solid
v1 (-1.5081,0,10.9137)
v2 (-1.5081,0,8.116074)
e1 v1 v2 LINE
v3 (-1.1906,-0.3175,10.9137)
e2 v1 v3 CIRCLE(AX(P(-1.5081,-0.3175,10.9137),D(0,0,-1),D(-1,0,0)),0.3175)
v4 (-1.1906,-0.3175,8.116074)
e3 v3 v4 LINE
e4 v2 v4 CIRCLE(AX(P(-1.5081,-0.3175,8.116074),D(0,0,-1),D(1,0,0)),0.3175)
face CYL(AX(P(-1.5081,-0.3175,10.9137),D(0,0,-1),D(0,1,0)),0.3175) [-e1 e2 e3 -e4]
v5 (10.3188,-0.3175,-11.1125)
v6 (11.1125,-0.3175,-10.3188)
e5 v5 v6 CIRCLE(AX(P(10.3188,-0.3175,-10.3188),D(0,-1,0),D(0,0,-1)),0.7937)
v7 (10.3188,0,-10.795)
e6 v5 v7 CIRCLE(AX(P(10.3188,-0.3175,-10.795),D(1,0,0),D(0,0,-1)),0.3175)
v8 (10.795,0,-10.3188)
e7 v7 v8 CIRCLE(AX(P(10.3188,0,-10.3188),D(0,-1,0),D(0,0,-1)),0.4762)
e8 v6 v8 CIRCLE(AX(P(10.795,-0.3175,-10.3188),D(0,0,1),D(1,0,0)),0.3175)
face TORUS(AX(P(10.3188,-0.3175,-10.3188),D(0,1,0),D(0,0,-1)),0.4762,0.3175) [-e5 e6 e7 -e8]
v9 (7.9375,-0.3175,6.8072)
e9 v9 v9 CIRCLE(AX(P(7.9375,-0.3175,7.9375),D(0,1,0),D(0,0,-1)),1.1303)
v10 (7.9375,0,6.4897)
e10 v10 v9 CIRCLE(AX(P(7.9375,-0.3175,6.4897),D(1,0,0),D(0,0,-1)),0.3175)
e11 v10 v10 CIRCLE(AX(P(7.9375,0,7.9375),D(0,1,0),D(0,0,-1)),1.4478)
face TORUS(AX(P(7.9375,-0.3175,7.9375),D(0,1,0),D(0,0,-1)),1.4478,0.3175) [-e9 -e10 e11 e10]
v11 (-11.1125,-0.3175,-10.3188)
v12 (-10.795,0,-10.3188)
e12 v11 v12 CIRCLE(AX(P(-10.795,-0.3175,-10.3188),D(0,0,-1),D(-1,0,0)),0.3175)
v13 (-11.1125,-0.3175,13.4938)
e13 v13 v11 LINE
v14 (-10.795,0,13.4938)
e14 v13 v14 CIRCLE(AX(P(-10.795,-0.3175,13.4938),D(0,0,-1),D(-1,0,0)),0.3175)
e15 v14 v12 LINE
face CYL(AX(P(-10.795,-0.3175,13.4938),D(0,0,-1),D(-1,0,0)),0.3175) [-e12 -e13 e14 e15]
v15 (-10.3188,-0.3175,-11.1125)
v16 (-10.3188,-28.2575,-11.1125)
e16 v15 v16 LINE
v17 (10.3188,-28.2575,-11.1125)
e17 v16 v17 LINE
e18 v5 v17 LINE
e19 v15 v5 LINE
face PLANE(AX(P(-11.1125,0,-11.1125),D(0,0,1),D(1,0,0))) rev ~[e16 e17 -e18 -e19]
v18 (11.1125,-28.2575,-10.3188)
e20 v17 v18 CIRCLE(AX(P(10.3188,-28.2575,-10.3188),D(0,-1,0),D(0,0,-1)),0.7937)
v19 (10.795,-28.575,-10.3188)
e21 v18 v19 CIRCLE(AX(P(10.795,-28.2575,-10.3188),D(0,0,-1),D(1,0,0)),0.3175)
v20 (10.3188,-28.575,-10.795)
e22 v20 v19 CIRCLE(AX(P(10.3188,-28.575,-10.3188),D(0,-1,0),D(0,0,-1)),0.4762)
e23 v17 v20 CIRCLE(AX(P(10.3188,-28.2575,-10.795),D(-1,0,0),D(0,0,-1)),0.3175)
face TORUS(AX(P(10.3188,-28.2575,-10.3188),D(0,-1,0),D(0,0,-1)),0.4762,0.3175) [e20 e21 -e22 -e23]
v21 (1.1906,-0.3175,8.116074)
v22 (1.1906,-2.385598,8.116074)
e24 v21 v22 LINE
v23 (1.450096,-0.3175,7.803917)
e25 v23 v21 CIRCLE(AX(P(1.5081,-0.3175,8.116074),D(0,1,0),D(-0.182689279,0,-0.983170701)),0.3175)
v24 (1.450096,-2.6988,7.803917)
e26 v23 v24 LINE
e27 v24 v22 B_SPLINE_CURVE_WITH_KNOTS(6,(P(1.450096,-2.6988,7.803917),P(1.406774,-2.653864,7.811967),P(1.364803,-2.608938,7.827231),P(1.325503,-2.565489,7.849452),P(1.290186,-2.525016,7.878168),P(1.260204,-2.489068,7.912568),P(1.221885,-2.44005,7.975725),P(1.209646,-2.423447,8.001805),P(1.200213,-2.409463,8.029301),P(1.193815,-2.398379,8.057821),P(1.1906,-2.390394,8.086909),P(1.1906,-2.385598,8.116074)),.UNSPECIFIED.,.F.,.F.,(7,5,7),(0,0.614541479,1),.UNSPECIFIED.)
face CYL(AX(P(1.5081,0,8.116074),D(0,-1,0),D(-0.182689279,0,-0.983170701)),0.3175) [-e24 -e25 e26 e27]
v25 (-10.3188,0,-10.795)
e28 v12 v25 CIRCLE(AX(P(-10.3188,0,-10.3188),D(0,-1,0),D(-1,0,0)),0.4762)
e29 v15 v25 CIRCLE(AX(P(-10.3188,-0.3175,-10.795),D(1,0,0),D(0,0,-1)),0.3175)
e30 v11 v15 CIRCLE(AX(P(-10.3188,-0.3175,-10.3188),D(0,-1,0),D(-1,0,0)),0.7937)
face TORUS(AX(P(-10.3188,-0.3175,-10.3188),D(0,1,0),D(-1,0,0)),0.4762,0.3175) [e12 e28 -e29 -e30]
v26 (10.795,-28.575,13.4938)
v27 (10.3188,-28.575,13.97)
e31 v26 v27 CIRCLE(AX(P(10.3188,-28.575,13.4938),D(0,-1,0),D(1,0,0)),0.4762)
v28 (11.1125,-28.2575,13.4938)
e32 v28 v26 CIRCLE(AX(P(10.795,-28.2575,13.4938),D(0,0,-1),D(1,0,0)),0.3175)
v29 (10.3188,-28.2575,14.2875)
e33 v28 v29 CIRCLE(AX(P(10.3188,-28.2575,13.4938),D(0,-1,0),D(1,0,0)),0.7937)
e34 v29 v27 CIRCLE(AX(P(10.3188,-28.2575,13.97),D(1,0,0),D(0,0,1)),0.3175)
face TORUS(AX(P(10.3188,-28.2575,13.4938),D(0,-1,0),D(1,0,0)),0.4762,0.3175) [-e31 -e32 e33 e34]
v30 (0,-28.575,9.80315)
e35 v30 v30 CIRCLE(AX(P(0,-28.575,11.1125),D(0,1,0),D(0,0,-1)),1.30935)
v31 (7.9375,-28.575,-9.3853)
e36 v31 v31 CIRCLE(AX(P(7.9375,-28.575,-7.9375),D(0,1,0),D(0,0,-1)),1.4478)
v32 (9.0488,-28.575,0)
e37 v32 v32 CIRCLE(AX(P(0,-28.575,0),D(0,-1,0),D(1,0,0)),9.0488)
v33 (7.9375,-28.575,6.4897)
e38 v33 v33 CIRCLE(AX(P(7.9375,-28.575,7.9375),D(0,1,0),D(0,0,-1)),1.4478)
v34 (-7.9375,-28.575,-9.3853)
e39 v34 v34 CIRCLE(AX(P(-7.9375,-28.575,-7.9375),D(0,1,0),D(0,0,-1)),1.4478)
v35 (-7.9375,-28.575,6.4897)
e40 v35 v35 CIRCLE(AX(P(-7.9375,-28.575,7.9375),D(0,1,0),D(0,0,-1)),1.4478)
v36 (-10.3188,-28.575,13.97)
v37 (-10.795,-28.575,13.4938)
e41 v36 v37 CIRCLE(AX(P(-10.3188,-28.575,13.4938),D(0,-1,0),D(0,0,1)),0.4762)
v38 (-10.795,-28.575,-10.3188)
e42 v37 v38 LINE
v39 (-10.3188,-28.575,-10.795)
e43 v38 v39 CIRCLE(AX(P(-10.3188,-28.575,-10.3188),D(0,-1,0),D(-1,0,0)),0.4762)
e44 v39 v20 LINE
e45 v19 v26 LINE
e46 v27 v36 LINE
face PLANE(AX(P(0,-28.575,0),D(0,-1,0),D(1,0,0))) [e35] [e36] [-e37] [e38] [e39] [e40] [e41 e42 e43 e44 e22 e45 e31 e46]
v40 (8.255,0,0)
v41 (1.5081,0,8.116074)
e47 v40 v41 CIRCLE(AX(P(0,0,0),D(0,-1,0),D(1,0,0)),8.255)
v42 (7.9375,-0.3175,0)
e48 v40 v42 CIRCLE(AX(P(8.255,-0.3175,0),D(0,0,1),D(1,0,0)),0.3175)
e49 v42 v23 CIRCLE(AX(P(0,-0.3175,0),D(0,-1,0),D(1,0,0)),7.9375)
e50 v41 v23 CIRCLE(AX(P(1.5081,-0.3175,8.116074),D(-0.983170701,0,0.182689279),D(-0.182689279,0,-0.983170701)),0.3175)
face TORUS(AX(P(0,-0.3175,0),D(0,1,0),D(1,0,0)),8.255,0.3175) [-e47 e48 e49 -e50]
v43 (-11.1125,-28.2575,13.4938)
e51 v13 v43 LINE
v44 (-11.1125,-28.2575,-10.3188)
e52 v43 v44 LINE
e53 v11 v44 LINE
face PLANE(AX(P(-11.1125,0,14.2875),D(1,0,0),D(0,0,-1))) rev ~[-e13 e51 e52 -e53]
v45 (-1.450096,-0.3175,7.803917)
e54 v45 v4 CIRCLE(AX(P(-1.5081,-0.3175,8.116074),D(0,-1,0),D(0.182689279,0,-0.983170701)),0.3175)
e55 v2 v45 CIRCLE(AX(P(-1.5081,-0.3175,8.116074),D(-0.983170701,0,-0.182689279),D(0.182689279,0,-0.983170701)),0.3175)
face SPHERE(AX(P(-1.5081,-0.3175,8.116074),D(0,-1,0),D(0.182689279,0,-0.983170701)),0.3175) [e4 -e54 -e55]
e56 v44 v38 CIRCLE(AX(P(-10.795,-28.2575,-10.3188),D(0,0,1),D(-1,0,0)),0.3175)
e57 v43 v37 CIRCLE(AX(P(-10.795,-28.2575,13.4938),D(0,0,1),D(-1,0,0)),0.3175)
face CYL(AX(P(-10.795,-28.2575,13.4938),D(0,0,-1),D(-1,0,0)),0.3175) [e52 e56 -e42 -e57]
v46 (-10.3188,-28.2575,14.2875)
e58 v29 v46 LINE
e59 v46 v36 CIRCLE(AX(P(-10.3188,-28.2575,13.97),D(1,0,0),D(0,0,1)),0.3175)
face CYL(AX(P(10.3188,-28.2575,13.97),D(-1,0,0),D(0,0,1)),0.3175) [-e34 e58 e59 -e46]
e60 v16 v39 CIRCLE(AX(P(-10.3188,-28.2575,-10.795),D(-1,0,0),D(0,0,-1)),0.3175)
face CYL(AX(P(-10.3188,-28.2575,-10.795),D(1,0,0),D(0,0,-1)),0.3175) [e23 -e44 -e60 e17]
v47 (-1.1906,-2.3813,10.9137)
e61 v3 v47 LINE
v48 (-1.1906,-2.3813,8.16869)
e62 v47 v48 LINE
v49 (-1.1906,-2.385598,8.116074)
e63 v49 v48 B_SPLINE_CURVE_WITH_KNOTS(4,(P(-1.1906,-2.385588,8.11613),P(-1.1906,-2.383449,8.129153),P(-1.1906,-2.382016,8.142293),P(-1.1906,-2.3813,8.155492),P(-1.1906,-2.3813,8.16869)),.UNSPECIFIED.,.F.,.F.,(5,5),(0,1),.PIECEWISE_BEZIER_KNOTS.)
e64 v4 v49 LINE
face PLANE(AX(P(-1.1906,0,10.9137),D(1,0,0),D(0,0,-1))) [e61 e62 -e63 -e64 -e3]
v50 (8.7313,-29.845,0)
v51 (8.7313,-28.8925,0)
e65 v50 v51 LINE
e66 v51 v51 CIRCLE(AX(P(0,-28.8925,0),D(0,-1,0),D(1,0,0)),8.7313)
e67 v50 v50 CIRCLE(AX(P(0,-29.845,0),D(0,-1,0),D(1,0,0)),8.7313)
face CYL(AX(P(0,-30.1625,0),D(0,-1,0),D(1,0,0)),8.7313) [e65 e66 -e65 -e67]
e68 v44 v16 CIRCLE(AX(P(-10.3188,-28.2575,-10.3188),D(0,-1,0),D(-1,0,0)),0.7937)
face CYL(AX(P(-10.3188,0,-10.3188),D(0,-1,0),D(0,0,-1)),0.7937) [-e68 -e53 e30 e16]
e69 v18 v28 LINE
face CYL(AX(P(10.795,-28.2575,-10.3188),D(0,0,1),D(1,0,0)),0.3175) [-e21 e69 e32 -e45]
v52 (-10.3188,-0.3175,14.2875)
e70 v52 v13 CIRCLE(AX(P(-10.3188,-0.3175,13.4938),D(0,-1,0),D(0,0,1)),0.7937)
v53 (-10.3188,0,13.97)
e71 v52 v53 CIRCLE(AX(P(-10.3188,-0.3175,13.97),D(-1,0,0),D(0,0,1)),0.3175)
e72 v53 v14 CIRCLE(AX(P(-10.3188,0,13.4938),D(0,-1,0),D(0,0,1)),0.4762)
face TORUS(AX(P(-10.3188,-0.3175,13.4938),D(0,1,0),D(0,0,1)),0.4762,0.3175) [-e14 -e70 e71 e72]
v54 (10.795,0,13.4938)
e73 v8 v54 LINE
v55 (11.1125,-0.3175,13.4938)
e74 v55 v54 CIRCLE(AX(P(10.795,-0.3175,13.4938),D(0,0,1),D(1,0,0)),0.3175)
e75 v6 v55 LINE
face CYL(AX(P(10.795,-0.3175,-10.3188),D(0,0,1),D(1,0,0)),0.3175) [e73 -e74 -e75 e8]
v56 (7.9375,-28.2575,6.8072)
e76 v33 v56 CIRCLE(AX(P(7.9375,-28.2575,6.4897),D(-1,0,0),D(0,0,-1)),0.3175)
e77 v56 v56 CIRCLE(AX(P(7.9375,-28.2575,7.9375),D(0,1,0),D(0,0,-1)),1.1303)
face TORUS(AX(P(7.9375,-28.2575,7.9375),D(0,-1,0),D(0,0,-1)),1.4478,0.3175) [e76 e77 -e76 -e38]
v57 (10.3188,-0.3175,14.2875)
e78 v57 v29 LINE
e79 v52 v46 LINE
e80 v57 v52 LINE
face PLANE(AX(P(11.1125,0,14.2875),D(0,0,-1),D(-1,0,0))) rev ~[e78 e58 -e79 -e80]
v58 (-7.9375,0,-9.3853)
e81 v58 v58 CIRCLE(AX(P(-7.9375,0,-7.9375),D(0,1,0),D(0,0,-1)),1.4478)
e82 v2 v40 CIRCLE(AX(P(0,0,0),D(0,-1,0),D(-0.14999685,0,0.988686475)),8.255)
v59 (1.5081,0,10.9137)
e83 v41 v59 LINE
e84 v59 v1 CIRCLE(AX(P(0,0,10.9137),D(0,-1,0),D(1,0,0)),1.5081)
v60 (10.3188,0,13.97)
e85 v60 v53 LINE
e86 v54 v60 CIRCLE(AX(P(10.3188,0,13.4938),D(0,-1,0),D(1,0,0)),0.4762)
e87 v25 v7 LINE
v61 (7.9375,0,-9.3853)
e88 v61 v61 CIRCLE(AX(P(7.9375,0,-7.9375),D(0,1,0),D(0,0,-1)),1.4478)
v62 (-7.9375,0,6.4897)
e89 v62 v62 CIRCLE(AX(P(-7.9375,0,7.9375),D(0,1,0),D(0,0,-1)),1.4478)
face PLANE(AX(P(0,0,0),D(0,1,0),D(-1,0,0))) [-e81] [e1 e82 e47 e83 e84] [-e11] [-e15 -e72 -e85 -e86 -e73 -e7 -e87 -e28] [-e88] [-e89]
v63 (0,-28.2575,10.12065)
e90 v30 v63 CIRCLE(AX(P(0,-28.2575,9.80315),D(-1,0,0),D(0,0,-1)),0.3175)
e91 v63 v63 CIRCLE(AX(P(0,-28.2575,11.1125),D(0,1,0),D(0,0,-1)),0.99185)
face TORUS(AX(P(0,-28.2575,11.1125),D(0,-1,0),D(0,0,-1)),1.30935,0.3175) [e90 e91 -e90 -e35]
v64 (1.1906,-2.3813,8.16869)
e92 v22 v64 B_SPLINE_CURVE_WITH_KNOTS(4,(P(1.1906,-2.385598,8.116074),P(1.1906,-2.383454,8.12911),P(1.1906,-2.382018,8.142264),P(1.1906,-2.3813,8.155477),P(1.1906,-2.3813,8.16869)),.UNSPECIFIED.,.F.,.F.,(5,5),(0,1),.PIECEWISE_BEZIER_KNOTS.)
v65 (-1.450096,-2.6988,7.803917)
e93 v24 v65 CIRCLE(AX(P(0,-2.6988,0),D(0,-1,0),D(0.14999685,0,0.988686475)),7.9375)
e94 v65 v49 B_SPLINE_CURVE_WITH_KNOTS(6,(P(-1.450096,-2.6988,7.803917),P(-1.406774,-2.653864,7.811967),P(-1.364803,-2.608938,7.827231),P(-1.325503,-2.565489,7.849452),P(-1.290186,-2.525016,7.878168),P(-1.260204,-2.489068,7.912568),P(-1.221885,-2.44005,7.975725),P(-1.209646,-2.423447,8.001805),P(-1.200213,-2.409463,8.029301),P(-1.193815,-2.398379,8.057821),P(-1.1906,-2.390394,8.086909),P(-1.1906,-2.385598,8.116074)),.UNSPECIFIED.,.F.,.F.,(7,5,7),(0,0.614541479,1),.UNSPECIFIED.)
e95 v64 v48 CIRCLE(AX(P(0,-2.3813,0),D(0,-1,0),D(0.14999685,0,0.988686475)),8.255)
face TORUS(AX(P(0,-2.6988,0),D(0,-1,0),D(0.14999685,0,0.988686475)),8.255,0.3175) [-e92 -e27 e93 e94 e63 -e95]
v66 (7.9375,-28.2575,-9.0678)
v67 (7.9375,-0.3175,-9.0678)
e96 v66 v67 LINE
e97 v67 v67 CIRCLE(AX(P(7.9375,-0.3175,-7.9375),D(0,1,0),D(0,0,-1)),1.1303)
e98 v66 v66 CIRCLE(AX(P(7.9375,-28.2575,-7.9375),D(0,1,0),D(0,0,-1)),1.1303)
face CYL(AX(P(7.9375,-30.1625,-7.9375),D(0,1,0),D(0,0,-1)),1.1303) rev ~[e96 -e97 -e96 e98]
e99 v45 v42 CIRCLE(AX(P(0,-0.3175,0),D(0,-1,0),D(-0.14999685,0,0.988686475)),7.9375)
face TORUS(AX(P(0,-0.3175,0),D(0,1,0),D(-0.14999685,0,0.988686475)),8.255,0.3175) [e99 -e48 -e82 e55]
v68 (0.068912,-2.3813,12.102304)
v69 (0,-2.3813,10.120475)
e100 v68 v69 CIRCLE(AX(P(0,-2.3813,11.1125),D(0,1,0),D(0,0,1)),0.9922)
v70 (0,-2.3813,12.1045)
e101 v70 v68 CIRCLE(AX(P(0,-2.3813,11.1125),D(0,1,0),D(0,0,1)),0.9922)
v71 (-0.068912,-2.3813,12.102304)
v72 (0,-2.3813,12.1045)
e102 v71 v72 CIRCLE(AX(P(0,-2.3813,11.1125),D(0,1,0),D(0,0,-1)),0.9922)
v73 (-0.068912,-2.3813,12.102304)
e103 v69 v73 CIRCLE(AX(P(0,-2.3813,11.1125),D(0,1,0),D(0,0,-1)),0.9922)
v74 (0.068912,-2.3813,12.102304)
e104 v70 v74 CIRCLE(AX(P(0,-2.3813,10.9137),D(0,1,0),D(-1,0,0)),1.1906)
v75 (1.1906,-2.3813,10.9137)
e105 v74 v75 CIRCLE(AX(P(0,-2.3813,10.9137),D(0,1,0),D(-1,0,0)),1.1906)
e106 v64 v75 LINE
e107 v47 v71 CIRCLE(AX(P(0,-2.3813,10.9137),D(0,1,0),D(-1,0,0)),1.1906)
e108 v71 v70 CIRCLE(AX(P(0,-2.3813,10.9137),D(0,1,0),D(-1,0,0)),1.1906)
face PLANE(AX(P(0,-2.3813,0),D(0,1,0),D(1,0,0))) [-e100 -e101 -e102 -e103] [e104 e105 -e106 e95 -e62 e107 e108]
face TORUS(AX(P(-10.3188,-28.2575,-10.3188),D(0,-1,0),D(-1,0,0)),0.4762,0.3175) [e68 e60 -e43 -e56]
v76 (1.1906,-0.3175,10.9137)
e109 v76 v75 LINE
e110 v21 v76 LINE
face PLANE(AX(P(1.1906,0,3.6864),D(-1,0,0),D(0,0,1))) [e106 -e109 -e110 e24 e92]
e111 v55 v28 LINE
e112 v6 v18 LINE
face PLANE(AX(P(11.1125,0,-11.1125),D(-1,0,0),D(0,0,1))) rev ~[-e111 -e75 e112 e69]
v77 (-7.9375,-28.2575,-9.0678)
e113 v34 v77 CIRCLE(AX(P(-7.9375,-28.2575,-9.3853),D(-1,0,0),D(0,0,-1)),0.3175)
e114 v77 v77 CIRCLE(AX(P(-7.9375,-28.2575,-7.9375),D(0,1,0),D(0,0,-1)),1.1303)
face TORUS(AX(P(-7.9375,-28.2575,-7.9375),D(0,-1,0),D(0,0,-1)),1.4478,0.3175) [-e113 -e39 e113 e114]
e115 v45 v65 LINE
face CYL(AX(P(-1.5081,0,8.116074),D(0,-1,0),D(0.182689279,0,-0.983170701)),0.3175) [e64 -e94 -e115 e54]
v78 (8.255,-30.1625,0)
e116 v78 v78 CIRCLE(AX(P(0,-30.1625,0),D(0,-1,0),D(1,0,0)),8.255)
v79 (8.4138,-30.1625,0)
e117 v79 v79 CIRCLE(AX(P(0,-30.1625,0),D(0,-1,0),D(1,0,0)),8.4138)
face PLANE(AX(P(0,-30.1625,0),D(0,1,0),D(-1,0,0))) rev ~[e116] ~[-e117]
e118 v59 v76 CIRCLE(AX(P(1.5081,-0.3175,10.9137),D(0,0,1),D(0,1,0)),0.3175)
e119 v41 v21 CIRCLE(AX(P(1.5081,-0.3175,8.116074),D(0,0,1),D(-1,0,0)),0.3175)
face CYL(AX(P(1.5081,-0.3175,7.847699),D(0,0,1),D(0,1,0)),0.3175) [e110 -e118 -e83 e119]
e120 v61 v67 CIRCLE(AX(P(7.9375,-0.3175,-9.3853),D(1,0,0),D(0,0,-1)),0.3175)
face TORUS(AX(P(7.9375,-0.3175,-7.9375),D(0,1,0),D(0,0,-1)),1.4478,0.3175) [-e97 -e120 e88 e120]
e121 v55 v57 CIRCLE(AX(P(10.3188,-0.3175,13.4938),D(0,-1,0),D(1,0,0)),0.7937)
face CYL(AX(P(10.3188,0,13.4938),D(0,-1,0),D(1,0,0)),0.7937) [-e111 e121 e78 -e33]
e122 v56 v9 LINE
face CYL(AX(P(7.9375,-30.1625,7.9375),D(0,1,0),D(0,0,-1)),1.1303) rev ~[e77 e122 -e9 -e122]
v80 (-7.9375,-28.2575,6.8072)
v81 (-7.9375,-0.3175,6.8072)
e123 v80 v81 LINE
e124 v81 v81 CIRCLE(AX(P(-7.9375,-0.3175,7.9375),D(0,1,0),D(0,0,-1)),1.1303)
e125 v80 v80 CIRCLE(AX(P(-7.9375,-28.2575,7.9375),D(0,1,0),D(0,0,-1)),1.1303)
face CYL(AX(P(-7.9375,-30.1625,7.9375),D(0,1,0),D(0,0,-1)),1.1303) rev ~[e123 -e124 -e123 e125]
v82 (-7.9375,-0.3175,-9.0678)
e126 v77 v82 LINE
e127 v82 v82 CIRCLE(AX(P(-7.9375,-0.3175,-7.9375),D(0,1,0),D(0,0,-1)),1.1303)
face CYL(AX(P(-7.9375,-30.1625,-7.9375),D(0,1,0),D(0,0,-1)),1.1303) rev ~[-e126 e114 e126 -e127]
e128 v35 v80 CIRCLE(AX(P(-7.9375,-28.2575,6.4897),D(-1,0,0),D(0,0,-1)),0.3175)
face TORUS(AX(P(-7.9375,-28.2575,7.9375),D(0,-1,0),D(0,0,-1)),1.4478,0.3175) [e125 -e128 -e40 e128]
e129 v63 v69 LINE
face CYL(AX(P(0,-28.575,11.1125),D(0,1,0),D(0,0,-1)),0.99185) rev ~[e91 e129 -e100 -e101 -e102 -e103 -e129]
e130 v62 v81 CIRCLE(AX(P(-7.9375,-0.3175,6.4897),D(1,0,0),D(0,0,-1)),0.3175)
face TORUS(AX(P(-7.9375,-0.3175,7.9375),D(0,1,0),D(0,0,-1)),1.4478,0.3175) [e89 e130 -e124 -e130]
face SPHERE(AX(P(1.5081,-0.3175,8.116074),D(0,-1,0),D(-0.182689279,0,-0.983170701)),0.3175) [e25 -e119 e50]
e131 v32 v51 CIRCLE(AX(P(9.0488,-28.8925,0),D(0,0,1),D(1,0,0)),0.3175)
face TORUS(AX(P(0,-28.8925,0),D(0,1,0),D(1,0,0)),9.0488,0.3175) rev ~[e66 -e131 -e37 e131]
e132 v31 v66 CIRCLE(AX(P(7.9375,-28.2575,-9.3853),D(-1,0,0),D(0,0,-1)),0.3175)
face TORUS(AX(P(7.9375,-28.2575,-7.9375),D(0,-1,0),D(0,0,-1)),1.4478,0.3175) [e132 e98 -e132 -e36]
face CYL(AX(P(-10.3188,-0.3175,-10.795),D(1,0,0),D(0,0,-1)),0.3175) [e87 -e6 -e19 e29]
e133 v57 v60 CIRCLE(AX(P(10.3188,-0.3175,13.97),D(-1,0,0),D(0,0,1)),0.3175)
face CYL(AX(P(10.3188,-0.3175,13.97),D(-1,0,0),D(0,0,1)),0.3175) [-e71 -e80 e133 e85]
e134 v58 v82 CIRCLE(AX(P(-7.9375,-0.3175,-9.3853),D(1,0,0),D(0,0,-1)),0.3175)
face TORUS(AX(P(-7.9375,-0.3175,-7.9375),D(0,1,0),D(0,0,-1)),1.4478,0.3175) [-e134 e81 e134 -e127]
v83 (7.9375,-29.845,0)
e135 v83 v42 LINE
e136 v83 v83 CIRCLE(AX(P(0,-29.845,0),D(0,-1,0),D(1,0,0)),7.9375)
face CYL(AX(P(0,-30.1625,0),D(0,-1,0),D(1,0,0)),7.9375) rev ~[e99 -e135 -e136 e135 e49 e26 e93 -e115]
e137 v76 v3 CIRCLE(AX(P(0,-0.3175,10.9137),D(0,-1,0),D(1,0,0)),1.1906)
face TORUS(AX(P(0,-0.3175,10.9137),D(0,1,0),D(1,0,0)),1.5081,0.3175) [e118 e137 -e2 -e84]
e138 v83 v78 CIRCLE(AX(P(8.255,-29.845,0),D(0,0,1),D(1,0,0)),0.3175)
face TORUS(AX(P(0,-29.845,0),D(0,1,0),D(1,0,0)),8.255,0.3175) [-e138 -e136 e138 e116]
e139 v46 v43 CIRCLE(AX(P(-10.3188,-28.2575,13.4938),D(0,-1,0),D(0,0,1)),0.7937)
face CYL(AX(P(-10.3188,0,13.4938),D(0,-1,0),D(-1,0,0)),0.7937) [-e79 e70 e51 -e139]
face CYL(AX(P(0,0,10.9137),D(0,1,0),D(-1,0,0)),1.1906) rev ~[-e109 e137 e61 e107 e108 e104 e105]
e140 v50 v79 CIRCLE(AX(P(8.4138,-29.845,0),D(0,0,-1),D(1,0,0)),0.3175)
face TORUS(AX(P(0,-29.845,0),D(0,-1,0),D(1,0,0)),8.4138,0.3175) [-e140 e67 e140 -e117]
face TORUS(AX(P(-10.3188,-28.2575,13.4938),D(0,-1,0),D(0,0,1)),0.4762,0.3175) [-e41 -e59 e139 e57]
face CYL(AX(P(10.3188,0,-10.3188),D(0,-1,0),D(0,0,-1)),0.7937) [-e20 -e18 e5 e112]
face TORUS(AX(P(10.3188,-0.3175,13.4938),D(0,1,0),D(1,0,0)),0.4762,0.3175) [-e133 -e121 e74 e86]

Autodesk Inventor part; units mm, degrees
ref_plane "YZ Plane" through (0, 0, 0) normal (1, 0, 0) x (0, 1, 0)
ref_plane "XZ Plane" through (0, 0, 0) normal (0, 1, 0) x (-1, 0, 0)
ref_plane "XY Plane" through (0, 0, 0) normal (0, 0, 1) x (1, 0, 0)
sketch "Sketch1" plane through (0, 0, 0) normal (0, 1, 0) x (-1, 0, 0)
  line L0 (11.1125, -11.1125) -> (-11.1125, -11.1125)
  line L1 (-11.1125, -11.1125) -> (-11.1125, 14.2875)
  line L2 (-11.1125, 14.2875) -> (11.1125, 14.2875)
  line L3 (11.1125, 14.2875) -> (11.1125, -11.1125)
  point P0 (0, 0)
  dimension "d0" = 25.4
  dimension "d1" = 11.1125
  dimension "d2" = 11.1125
  dimension "d3" = 11.1125
extrude "Extrusion1" add sketch "Sketch1" against normal blind 30.1625
sketch "Sketch2" plane through (0, -30.1625, 0) normal (0, -1, 0) x (1, 0, 0)
  line L0 (-11.1125, 14.2875) -> (-11.1125, -11.1125) projected
  line L1 (11.1125, -11.1125) -> (11.1125, 14.2875) projected
  line L2 (-11.1125, -11.1125) -> (11.1125, -11.1125) projected
  point P0 (0, 0)
  point P1 (7.9375, -7.9375)
  point P2 (-7.9375, -7.9375)
  point P3 (-7.9375, 7.9375)
  point P4 (7.9375, 7.9375)
  dimension "d6" = 15.875
  dimension "d8" = 15.875
  dimension "d12" = 3.175
  dimension "d13" = 3.175
  dimension "d14" = 3.175
  dimension "d15" = 0
  dimension "d16" = 15.875
  dimension "d18" = 15.875
hole "Hole1" at (7.9375, -30.1625, -7.9375) at (-7.9375, -30.1625, -7.9375) at (-7.9375, -30.1625, 7.9375) at (7.9375, -30.1625, 7.9375) direction (0, 1, 0) diameter 2.2606 end through all
sketch "Sketch3" plane through (0, -30.1625, 0) normal (0, -1, 0) x (1, 0, 0)
  circle A0 centre (0, 0) radius 7.9375
  dimension "d26" = 15.875
extrude "Extrusion2" cut sketch "Sketch3" against normal blind 30.1625
sketch "Sketch4" plane through (0, -30.1625, 0) normal (0, -1, 0) x (1, 0, 0)
  circle A0 centre (0, 0) radius 8.7313
  line L0 (-11.1125, -11.1125) -> (11.1125, -11.1125) projected
  line L1 (-11.1125, 14.2875) -> (-11.1125, -11.1125) projected
  line L2 (11.1125, -11.1125) -> (-11.1125, -11.1125)
  line L3 (-11.1125, -11.1125) -> (-11.1125, 14.2875)
  line L4 (-11.1125, 14.2875) -> (11.1125, 14.2875)
  line L5 (11.1125, 14.2875) -> (11.1125, -11.1125)
  dimension "d29" = 17.4625
extrude "Extrusion3" cut sketch "Sketch4" against normal blind 1.5875
sketch "Sketch5" plane through (0, -28.575, 0) normal (0, -1, 0) x (1, 0, 0)
  point P0 (0, 0)
  point P1 (0, 11.1125)
  dimension "d32" = 11.1125
  dimension "d33" = 0
hole "Hole2" at (0, -28.575, 11.1125) direction (0, 1, 0) diameter 1.9837 end through all
sketch "Sketch6" plane through (0, 0, 0) normal (0, 1, 0) x (1, 0, 0)
  line L0 (-1.1906, -3.6864) -> (1.1906, -3.6864)
  line L1 (1.1906, -3.6864) -> (1.1906, -10.9137)
  line L2 (-1.1906, -10.9137) -> (-1.1906, -3.6864)
  circle A0 centre (0, -11.1125) radius 0.9922
  line L3 (-1.1906, -10.9137) -> (1.1906, -10.9137)
  arc A1 (-1.1906, -10.9137) -> (1.1906, -10.9137) centre (0, -10.9137) ccw
  circle A2 centre (0, -11.1125) radius 0.9919 projected
  point P0 (0, 0)
  dimension "d41" = 2.3813
  dimension "d42" = 1.1906
  dimension "d43" = 1.9844
  dimension "d44" = 0
  dimension "d45" = 11.1125
  dimension "d48" = 7.2273
extrude "Extrusion4" cut sketch "Sketch6" against normal blind 2.3813
fillet "Fillet1" radius 0.7937 4 edges at (11.1125, -14.2875, -11.1125) (11.1125, -14.2875, 14.2875) (-11.1125, -14.2875, -11.1125) (-11.1125, -14.2875, 14.2875)
fillet "Fillet2" radius 0.3175 28 edges at (-8.7313, -28.575, 0) (-7.9375, -30.1625, 0) (-8.7313, -30.1625, 0) (7.9375, -28.575, -6.8072) (-7.9375, -28.575, -6.8072) (0, 0, -11.1125) (0, -28.575, -11.1125) (10.88, 0, -10.88) (11.1125, 0, 1.5875) (10.88, 0, 14.055) (0, 0, 14.2875) (-10.88, 0, 14.055) (-11.1125, 0, 1.5875) (-10.88, 0, -10.88) (-10.88, -28.575, -10.88) (-11.1125, -28.575, 1.5875) (-10.88, -28.575, 14.055) (0, -28.575, 14.2875) (10.88, -28.575, 14.055) (11.1125, -28.575, 1.5875) (10.88, -28.575, -10.88) (-7.9375, -28.575, 9.0678) (0, -28.575, 12.1044) (7.9375, -28.575, 9.0678) (-7.9375, 0, -6.8072) (-7.9375, 0, 9.0678) (7.9375, 0, 9.0678) (7.9375, 0, -6.8072)
fillet "Fillet3" radius 0.3175 8 edges at (-5.1746, 0, -6.0189) (6.0189, 0, 5.1746) (-1.1906, 0, 9.3807) (1.1906, 0, 9.3807) (0, 0, 12.1044) (0, -2.3813, 7.9375) (-1.1906, -1.1906, 7.8477) (1.1906, -1.1906, 7.8477)
properties part number "cylinder.." material "Stainless Steel"
